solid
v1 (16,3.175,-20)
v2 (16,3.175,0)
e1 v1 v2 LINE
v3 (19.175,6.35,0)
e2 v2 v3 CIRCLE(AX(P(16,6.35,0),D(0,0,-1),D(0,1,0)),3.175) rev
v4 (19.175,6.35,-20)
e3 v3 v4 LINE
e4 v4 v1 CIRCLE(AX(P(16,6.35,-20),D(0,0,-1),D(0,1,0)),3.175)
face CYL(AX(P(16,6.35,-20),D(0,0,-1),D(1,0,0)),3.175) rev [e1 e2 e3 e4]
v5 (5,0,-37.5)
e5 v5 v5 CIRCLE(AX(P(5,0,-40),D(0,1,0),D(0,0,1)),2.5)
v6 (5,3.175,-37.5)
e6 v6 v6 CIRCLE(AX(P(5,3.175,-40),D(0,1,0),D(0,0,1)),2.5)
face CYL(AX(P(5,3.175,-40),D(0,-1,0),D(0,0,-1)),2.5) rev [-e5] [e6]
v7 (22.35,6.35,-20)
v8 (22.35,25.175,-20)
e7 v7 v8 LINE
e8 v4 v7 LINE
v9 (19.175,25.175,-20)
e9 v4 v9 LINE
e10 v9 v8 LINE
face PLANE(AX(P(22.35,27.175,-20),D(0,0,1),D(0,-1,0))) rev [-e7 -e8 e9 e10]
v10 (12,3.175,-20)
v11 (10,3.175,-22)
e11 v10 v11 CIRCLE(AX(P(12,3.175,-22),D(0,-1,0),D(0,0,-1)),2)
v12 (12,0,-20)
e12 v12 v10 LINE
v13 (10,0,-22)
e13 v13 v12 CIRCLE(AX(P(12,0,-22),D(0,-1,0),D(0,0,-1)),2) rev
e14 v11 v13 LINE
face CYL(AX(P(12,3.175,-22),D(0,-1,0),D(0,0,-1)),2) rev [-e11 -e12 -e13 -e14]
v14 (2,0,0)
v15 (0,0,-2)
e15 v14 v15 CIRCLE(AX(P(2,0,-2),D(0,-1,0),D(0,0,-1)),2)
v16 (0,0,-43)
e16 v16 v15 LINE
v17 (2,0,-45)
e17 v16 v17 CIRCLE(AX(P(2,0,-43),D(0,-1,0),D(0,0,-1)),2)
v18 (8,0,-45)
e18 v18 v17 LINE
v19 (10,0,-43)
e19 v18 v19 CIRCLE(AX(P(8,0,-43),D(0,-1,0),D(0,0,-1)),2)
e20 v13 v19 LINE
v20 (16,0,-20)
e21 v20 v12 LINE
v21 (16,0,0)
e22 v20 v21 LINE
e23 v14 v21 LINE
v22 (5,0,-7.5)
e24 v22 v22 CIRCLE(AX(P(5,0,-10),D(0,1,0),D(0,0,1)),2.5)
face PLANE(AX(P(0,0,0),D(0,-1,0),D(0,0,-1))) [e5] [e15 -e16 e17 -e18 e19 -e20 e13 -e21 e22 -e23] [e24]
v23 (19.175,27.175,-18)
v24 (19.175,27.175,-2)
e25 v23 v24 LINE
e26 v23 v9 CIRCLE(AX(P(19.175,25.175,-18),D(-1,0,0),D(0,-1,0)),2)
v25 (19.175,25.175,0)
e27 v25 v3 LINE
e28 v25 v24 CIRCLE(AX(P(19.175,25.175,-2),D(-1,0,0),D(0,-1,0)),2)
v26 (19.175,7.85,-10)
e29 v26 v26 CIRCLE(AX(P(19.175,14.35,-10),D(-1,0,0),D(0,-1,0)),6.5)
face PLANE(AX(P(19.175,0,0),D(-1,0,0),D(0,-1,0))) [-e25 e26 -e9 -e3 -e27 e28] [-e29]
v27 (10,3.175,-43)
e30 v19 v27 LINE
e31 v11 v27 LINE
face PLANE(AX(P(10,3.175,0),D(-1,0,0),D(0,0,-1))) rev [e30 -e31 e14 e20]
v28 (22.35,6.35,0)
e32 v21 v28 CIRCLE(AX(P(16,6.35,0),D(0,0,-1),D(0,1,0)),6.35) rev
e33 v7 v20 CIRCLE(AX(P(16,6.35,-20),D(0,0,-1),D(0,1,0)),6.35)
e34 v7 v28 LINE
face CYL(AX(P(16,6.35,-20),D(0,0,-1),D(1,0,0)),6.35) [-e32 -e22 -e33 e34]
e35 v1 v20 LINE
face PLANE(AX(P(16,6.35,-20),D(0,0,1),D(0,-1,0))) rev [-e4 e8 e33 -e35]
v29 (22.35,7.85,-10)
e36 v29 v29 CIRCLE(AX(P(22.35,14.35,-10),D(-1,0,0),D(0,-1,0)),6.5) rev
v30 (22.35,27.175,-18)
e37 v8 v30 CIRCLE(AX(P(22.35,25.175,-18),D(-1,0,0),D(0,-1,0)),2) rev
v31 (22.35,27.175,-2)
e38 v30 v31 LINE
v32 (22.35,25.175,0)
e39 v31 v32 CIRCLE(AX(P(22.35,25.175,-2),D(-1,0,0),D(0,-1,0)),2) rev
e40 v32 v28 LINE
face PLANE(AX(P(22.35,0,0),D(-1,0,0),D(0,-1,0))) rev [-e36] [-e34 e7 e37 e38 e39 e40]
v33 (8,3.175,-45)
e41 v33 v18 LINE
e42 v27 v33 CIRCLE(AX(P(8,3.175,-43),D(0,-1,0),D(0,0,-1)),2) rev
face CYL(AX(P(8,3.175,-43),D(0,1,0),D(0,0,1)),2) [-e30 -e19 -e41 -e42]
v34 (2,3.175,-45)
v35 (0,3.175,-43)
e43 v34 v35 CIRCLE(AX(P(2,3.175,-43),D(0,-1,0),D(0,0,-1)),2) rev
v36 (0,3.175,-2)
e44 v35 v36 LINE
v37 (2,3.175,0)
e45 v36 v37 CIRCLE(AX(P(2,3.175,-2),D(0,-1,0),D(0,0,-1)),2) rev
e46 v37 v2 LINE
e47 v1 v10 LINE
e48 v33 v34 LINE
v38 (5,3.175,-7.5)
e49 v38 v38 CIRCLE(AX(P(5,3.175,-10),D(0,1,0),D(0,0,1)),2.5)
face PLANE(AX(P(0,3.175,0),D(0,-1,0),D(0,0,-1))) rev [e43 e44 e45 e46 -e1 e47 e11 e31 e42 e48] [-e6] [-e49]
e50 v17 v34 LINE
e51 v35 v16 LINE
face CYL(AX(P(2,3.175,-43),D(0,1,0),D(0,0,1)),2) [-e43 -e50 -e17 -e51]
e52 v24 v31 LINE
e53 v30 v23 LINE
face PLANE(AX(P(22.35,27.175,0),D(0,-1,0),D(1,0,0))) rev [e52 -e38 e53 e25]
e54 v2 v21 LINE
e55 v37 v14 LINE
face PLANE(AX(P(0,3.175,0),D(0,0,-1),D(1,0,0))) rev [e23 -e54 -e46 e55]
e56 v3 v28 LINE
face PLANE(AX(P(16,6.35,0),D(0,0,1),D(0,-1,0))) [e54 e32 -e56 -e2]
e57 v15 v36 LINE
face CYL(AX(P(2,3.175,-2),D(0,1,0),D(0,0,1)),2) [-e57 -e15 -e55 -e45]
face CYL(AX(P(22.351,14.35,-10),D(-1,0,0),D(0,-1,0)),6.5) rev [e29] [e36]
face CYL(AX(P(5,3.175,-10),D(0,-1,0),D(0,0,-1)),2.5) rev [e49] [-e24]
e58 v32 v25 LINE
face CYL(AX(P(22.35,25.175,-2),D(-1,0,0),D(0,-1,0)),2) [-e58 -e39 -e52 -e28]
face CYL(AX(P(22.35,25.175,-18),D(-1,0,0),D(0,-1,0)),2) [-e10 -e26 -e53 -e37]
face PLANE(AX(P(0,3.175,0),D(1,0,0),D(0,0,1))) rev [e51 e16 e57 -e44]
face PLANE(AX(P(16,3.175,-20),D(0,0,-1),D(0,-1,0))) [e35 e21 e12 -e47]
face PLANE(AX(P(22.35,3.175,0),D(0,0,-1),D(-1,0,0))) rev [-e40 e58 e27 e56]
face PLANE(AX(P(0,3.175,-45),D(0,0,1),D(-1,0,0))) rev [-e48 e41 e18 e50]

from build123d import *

# Parameters (mm, degrees)
SKETCH2_W           = 10
SKETCH2_H           = 45
BOSS_EXTRUDE1_DEPTH = 3.175
CUT_EXTRUDE1_REACH  = 48.207
SKETCH4_R           = 2.5
EDGE_FLANGE2_DEPTH  = 20
CUT_EXTRUDE2_REACH  = 57.957
SKETCH15_R          = 6.5
FILLET1_R           = 2


# Sheet-metal steps are written as plain solids
with BuildPart() as part:
    # Sketch2 → Boss-Extrude1 (new body)
    with BuildSketch(Plane(origin=(0, 0, 0), x_dir=(1, 0, 0), z_dir=(0, 1, 0))):
        with Locations((5, 22.5)):
            Rectangle(SKETCH2_W, SKETCH2_H)
    extrude(amount=BOSS_EXTRUDE1_DEPTH)

    # Sketch4 → Cut-Extrude1 (cut, up to next)
    with BuildSketch(Plane(origin=(0, 3.175, 0), x_dir=(1, 0, 0), z_dir=(0, 1, 0)), mode=Mode.PRIVATE) as cut_extrude1_sk1:
        with Locations(Location((5, 10, 0), (0, 0, 270))):
            Circle(SKETCH4_R)
    cut_extrude1_tool1 = extrude(cut_extrude1_sk1.sketch, amount=-CUT_EXTRUDE1_REACH, mode=Mode.PRIVATE) & part.part
    # Sketch4 → Cut-Extrude1 (cut, up to next)
    with BuildSketch(Plane(origin=(0, 3.175, 0), x_dir=(1, 0, 0), z_dir=(0, 1, 0)), mode=Mode.PRIVATE) as cut_extrude1_sk2:
        with Locations(Location((5, 40, 0), (0, 0, 270))):
            Circle(SKETCH4_R)
    cut_extrude1_tool2 = extrude(cut_extrude1_sk2.sketch, amount=-CUT_EXTRUDE1_REACH, mode=Mode.PRIVATE) & part.part
    add(cut_extrude1_tool1.solids().sort_by_distance((5, 3.175, -10))[0], mode=Mode.SUBTRACT)
    add(cut_extrude1_tool2.solids().sort_by_distance((5, 3.175, -40))[0], mode=Mode.SUBTRACT)

    # Edge-Flange2 section (across the edge) → Edge-Flange2 (add)
    with BuildSketch(Plane(origin=(19.175, 3.175, 0), x_dir=(-1, 0, 0), z_dir=(0, 0, -1))):
        with BuildLine():
            Line((-3.175, 3.175), (-3.175, 24))
            Line((-3.175, 24), (0, 24))
            Line((0, 24), (0, 3.175))
            ThreePointArc((0, 3.175), (0.92993597, 0.92993597), (3.175, 0))
            Line((3.175, 0), (9.175, 0))
            Line((9.175, 0), (9.175, -3.175))
            Line((9.175, -3.175), (3.175, -3.175))
            ThreePointArc((3.175, -3.175), (-1.315128061, -1.315128061), (-3.175, 3.175))
        make_face()
    extrude(amount=EDGE_FLANGE2_DEPTH)

    # Sketch15 → Cut-Extrude2 (cut, up to next)
    with BuildSketch(Plane.ZY.offset(-19.175), mode=Mode.PRIVATE) as cut_extrude2_sk1:
        with Locations(Location((-10, 14.35, 0), (0, 0, 270))):
            Circle(SKETCH15_R)
    cut_extrude2_tool1 = extrude(cut_extrude2_sk1.sketch, amount=-CUT_EXTRUDE2_REACH, mode=Mode.PRIVATE) & part.part
    add(cut_extrude2_tool1.solids().sort_by_distance((19.175, 14.35, -10))[0], mode=Mode.SUBTRACT)

    # Fillet1
    fillet1_edges = [part.edges().sort_by_distance(p)[0] for p in [
        (0, 1.5875, 0),
        (0, 1.5875, -45),
        (10, 1.5875, -45),
        (10, 1.5875, -20),
        (20.7625, 27.175, 0),
        (20.7625, 27.175, -20),
    ]]
    fillet(fillet1_edges, radius=FILLET1_R)


solid = part.part
